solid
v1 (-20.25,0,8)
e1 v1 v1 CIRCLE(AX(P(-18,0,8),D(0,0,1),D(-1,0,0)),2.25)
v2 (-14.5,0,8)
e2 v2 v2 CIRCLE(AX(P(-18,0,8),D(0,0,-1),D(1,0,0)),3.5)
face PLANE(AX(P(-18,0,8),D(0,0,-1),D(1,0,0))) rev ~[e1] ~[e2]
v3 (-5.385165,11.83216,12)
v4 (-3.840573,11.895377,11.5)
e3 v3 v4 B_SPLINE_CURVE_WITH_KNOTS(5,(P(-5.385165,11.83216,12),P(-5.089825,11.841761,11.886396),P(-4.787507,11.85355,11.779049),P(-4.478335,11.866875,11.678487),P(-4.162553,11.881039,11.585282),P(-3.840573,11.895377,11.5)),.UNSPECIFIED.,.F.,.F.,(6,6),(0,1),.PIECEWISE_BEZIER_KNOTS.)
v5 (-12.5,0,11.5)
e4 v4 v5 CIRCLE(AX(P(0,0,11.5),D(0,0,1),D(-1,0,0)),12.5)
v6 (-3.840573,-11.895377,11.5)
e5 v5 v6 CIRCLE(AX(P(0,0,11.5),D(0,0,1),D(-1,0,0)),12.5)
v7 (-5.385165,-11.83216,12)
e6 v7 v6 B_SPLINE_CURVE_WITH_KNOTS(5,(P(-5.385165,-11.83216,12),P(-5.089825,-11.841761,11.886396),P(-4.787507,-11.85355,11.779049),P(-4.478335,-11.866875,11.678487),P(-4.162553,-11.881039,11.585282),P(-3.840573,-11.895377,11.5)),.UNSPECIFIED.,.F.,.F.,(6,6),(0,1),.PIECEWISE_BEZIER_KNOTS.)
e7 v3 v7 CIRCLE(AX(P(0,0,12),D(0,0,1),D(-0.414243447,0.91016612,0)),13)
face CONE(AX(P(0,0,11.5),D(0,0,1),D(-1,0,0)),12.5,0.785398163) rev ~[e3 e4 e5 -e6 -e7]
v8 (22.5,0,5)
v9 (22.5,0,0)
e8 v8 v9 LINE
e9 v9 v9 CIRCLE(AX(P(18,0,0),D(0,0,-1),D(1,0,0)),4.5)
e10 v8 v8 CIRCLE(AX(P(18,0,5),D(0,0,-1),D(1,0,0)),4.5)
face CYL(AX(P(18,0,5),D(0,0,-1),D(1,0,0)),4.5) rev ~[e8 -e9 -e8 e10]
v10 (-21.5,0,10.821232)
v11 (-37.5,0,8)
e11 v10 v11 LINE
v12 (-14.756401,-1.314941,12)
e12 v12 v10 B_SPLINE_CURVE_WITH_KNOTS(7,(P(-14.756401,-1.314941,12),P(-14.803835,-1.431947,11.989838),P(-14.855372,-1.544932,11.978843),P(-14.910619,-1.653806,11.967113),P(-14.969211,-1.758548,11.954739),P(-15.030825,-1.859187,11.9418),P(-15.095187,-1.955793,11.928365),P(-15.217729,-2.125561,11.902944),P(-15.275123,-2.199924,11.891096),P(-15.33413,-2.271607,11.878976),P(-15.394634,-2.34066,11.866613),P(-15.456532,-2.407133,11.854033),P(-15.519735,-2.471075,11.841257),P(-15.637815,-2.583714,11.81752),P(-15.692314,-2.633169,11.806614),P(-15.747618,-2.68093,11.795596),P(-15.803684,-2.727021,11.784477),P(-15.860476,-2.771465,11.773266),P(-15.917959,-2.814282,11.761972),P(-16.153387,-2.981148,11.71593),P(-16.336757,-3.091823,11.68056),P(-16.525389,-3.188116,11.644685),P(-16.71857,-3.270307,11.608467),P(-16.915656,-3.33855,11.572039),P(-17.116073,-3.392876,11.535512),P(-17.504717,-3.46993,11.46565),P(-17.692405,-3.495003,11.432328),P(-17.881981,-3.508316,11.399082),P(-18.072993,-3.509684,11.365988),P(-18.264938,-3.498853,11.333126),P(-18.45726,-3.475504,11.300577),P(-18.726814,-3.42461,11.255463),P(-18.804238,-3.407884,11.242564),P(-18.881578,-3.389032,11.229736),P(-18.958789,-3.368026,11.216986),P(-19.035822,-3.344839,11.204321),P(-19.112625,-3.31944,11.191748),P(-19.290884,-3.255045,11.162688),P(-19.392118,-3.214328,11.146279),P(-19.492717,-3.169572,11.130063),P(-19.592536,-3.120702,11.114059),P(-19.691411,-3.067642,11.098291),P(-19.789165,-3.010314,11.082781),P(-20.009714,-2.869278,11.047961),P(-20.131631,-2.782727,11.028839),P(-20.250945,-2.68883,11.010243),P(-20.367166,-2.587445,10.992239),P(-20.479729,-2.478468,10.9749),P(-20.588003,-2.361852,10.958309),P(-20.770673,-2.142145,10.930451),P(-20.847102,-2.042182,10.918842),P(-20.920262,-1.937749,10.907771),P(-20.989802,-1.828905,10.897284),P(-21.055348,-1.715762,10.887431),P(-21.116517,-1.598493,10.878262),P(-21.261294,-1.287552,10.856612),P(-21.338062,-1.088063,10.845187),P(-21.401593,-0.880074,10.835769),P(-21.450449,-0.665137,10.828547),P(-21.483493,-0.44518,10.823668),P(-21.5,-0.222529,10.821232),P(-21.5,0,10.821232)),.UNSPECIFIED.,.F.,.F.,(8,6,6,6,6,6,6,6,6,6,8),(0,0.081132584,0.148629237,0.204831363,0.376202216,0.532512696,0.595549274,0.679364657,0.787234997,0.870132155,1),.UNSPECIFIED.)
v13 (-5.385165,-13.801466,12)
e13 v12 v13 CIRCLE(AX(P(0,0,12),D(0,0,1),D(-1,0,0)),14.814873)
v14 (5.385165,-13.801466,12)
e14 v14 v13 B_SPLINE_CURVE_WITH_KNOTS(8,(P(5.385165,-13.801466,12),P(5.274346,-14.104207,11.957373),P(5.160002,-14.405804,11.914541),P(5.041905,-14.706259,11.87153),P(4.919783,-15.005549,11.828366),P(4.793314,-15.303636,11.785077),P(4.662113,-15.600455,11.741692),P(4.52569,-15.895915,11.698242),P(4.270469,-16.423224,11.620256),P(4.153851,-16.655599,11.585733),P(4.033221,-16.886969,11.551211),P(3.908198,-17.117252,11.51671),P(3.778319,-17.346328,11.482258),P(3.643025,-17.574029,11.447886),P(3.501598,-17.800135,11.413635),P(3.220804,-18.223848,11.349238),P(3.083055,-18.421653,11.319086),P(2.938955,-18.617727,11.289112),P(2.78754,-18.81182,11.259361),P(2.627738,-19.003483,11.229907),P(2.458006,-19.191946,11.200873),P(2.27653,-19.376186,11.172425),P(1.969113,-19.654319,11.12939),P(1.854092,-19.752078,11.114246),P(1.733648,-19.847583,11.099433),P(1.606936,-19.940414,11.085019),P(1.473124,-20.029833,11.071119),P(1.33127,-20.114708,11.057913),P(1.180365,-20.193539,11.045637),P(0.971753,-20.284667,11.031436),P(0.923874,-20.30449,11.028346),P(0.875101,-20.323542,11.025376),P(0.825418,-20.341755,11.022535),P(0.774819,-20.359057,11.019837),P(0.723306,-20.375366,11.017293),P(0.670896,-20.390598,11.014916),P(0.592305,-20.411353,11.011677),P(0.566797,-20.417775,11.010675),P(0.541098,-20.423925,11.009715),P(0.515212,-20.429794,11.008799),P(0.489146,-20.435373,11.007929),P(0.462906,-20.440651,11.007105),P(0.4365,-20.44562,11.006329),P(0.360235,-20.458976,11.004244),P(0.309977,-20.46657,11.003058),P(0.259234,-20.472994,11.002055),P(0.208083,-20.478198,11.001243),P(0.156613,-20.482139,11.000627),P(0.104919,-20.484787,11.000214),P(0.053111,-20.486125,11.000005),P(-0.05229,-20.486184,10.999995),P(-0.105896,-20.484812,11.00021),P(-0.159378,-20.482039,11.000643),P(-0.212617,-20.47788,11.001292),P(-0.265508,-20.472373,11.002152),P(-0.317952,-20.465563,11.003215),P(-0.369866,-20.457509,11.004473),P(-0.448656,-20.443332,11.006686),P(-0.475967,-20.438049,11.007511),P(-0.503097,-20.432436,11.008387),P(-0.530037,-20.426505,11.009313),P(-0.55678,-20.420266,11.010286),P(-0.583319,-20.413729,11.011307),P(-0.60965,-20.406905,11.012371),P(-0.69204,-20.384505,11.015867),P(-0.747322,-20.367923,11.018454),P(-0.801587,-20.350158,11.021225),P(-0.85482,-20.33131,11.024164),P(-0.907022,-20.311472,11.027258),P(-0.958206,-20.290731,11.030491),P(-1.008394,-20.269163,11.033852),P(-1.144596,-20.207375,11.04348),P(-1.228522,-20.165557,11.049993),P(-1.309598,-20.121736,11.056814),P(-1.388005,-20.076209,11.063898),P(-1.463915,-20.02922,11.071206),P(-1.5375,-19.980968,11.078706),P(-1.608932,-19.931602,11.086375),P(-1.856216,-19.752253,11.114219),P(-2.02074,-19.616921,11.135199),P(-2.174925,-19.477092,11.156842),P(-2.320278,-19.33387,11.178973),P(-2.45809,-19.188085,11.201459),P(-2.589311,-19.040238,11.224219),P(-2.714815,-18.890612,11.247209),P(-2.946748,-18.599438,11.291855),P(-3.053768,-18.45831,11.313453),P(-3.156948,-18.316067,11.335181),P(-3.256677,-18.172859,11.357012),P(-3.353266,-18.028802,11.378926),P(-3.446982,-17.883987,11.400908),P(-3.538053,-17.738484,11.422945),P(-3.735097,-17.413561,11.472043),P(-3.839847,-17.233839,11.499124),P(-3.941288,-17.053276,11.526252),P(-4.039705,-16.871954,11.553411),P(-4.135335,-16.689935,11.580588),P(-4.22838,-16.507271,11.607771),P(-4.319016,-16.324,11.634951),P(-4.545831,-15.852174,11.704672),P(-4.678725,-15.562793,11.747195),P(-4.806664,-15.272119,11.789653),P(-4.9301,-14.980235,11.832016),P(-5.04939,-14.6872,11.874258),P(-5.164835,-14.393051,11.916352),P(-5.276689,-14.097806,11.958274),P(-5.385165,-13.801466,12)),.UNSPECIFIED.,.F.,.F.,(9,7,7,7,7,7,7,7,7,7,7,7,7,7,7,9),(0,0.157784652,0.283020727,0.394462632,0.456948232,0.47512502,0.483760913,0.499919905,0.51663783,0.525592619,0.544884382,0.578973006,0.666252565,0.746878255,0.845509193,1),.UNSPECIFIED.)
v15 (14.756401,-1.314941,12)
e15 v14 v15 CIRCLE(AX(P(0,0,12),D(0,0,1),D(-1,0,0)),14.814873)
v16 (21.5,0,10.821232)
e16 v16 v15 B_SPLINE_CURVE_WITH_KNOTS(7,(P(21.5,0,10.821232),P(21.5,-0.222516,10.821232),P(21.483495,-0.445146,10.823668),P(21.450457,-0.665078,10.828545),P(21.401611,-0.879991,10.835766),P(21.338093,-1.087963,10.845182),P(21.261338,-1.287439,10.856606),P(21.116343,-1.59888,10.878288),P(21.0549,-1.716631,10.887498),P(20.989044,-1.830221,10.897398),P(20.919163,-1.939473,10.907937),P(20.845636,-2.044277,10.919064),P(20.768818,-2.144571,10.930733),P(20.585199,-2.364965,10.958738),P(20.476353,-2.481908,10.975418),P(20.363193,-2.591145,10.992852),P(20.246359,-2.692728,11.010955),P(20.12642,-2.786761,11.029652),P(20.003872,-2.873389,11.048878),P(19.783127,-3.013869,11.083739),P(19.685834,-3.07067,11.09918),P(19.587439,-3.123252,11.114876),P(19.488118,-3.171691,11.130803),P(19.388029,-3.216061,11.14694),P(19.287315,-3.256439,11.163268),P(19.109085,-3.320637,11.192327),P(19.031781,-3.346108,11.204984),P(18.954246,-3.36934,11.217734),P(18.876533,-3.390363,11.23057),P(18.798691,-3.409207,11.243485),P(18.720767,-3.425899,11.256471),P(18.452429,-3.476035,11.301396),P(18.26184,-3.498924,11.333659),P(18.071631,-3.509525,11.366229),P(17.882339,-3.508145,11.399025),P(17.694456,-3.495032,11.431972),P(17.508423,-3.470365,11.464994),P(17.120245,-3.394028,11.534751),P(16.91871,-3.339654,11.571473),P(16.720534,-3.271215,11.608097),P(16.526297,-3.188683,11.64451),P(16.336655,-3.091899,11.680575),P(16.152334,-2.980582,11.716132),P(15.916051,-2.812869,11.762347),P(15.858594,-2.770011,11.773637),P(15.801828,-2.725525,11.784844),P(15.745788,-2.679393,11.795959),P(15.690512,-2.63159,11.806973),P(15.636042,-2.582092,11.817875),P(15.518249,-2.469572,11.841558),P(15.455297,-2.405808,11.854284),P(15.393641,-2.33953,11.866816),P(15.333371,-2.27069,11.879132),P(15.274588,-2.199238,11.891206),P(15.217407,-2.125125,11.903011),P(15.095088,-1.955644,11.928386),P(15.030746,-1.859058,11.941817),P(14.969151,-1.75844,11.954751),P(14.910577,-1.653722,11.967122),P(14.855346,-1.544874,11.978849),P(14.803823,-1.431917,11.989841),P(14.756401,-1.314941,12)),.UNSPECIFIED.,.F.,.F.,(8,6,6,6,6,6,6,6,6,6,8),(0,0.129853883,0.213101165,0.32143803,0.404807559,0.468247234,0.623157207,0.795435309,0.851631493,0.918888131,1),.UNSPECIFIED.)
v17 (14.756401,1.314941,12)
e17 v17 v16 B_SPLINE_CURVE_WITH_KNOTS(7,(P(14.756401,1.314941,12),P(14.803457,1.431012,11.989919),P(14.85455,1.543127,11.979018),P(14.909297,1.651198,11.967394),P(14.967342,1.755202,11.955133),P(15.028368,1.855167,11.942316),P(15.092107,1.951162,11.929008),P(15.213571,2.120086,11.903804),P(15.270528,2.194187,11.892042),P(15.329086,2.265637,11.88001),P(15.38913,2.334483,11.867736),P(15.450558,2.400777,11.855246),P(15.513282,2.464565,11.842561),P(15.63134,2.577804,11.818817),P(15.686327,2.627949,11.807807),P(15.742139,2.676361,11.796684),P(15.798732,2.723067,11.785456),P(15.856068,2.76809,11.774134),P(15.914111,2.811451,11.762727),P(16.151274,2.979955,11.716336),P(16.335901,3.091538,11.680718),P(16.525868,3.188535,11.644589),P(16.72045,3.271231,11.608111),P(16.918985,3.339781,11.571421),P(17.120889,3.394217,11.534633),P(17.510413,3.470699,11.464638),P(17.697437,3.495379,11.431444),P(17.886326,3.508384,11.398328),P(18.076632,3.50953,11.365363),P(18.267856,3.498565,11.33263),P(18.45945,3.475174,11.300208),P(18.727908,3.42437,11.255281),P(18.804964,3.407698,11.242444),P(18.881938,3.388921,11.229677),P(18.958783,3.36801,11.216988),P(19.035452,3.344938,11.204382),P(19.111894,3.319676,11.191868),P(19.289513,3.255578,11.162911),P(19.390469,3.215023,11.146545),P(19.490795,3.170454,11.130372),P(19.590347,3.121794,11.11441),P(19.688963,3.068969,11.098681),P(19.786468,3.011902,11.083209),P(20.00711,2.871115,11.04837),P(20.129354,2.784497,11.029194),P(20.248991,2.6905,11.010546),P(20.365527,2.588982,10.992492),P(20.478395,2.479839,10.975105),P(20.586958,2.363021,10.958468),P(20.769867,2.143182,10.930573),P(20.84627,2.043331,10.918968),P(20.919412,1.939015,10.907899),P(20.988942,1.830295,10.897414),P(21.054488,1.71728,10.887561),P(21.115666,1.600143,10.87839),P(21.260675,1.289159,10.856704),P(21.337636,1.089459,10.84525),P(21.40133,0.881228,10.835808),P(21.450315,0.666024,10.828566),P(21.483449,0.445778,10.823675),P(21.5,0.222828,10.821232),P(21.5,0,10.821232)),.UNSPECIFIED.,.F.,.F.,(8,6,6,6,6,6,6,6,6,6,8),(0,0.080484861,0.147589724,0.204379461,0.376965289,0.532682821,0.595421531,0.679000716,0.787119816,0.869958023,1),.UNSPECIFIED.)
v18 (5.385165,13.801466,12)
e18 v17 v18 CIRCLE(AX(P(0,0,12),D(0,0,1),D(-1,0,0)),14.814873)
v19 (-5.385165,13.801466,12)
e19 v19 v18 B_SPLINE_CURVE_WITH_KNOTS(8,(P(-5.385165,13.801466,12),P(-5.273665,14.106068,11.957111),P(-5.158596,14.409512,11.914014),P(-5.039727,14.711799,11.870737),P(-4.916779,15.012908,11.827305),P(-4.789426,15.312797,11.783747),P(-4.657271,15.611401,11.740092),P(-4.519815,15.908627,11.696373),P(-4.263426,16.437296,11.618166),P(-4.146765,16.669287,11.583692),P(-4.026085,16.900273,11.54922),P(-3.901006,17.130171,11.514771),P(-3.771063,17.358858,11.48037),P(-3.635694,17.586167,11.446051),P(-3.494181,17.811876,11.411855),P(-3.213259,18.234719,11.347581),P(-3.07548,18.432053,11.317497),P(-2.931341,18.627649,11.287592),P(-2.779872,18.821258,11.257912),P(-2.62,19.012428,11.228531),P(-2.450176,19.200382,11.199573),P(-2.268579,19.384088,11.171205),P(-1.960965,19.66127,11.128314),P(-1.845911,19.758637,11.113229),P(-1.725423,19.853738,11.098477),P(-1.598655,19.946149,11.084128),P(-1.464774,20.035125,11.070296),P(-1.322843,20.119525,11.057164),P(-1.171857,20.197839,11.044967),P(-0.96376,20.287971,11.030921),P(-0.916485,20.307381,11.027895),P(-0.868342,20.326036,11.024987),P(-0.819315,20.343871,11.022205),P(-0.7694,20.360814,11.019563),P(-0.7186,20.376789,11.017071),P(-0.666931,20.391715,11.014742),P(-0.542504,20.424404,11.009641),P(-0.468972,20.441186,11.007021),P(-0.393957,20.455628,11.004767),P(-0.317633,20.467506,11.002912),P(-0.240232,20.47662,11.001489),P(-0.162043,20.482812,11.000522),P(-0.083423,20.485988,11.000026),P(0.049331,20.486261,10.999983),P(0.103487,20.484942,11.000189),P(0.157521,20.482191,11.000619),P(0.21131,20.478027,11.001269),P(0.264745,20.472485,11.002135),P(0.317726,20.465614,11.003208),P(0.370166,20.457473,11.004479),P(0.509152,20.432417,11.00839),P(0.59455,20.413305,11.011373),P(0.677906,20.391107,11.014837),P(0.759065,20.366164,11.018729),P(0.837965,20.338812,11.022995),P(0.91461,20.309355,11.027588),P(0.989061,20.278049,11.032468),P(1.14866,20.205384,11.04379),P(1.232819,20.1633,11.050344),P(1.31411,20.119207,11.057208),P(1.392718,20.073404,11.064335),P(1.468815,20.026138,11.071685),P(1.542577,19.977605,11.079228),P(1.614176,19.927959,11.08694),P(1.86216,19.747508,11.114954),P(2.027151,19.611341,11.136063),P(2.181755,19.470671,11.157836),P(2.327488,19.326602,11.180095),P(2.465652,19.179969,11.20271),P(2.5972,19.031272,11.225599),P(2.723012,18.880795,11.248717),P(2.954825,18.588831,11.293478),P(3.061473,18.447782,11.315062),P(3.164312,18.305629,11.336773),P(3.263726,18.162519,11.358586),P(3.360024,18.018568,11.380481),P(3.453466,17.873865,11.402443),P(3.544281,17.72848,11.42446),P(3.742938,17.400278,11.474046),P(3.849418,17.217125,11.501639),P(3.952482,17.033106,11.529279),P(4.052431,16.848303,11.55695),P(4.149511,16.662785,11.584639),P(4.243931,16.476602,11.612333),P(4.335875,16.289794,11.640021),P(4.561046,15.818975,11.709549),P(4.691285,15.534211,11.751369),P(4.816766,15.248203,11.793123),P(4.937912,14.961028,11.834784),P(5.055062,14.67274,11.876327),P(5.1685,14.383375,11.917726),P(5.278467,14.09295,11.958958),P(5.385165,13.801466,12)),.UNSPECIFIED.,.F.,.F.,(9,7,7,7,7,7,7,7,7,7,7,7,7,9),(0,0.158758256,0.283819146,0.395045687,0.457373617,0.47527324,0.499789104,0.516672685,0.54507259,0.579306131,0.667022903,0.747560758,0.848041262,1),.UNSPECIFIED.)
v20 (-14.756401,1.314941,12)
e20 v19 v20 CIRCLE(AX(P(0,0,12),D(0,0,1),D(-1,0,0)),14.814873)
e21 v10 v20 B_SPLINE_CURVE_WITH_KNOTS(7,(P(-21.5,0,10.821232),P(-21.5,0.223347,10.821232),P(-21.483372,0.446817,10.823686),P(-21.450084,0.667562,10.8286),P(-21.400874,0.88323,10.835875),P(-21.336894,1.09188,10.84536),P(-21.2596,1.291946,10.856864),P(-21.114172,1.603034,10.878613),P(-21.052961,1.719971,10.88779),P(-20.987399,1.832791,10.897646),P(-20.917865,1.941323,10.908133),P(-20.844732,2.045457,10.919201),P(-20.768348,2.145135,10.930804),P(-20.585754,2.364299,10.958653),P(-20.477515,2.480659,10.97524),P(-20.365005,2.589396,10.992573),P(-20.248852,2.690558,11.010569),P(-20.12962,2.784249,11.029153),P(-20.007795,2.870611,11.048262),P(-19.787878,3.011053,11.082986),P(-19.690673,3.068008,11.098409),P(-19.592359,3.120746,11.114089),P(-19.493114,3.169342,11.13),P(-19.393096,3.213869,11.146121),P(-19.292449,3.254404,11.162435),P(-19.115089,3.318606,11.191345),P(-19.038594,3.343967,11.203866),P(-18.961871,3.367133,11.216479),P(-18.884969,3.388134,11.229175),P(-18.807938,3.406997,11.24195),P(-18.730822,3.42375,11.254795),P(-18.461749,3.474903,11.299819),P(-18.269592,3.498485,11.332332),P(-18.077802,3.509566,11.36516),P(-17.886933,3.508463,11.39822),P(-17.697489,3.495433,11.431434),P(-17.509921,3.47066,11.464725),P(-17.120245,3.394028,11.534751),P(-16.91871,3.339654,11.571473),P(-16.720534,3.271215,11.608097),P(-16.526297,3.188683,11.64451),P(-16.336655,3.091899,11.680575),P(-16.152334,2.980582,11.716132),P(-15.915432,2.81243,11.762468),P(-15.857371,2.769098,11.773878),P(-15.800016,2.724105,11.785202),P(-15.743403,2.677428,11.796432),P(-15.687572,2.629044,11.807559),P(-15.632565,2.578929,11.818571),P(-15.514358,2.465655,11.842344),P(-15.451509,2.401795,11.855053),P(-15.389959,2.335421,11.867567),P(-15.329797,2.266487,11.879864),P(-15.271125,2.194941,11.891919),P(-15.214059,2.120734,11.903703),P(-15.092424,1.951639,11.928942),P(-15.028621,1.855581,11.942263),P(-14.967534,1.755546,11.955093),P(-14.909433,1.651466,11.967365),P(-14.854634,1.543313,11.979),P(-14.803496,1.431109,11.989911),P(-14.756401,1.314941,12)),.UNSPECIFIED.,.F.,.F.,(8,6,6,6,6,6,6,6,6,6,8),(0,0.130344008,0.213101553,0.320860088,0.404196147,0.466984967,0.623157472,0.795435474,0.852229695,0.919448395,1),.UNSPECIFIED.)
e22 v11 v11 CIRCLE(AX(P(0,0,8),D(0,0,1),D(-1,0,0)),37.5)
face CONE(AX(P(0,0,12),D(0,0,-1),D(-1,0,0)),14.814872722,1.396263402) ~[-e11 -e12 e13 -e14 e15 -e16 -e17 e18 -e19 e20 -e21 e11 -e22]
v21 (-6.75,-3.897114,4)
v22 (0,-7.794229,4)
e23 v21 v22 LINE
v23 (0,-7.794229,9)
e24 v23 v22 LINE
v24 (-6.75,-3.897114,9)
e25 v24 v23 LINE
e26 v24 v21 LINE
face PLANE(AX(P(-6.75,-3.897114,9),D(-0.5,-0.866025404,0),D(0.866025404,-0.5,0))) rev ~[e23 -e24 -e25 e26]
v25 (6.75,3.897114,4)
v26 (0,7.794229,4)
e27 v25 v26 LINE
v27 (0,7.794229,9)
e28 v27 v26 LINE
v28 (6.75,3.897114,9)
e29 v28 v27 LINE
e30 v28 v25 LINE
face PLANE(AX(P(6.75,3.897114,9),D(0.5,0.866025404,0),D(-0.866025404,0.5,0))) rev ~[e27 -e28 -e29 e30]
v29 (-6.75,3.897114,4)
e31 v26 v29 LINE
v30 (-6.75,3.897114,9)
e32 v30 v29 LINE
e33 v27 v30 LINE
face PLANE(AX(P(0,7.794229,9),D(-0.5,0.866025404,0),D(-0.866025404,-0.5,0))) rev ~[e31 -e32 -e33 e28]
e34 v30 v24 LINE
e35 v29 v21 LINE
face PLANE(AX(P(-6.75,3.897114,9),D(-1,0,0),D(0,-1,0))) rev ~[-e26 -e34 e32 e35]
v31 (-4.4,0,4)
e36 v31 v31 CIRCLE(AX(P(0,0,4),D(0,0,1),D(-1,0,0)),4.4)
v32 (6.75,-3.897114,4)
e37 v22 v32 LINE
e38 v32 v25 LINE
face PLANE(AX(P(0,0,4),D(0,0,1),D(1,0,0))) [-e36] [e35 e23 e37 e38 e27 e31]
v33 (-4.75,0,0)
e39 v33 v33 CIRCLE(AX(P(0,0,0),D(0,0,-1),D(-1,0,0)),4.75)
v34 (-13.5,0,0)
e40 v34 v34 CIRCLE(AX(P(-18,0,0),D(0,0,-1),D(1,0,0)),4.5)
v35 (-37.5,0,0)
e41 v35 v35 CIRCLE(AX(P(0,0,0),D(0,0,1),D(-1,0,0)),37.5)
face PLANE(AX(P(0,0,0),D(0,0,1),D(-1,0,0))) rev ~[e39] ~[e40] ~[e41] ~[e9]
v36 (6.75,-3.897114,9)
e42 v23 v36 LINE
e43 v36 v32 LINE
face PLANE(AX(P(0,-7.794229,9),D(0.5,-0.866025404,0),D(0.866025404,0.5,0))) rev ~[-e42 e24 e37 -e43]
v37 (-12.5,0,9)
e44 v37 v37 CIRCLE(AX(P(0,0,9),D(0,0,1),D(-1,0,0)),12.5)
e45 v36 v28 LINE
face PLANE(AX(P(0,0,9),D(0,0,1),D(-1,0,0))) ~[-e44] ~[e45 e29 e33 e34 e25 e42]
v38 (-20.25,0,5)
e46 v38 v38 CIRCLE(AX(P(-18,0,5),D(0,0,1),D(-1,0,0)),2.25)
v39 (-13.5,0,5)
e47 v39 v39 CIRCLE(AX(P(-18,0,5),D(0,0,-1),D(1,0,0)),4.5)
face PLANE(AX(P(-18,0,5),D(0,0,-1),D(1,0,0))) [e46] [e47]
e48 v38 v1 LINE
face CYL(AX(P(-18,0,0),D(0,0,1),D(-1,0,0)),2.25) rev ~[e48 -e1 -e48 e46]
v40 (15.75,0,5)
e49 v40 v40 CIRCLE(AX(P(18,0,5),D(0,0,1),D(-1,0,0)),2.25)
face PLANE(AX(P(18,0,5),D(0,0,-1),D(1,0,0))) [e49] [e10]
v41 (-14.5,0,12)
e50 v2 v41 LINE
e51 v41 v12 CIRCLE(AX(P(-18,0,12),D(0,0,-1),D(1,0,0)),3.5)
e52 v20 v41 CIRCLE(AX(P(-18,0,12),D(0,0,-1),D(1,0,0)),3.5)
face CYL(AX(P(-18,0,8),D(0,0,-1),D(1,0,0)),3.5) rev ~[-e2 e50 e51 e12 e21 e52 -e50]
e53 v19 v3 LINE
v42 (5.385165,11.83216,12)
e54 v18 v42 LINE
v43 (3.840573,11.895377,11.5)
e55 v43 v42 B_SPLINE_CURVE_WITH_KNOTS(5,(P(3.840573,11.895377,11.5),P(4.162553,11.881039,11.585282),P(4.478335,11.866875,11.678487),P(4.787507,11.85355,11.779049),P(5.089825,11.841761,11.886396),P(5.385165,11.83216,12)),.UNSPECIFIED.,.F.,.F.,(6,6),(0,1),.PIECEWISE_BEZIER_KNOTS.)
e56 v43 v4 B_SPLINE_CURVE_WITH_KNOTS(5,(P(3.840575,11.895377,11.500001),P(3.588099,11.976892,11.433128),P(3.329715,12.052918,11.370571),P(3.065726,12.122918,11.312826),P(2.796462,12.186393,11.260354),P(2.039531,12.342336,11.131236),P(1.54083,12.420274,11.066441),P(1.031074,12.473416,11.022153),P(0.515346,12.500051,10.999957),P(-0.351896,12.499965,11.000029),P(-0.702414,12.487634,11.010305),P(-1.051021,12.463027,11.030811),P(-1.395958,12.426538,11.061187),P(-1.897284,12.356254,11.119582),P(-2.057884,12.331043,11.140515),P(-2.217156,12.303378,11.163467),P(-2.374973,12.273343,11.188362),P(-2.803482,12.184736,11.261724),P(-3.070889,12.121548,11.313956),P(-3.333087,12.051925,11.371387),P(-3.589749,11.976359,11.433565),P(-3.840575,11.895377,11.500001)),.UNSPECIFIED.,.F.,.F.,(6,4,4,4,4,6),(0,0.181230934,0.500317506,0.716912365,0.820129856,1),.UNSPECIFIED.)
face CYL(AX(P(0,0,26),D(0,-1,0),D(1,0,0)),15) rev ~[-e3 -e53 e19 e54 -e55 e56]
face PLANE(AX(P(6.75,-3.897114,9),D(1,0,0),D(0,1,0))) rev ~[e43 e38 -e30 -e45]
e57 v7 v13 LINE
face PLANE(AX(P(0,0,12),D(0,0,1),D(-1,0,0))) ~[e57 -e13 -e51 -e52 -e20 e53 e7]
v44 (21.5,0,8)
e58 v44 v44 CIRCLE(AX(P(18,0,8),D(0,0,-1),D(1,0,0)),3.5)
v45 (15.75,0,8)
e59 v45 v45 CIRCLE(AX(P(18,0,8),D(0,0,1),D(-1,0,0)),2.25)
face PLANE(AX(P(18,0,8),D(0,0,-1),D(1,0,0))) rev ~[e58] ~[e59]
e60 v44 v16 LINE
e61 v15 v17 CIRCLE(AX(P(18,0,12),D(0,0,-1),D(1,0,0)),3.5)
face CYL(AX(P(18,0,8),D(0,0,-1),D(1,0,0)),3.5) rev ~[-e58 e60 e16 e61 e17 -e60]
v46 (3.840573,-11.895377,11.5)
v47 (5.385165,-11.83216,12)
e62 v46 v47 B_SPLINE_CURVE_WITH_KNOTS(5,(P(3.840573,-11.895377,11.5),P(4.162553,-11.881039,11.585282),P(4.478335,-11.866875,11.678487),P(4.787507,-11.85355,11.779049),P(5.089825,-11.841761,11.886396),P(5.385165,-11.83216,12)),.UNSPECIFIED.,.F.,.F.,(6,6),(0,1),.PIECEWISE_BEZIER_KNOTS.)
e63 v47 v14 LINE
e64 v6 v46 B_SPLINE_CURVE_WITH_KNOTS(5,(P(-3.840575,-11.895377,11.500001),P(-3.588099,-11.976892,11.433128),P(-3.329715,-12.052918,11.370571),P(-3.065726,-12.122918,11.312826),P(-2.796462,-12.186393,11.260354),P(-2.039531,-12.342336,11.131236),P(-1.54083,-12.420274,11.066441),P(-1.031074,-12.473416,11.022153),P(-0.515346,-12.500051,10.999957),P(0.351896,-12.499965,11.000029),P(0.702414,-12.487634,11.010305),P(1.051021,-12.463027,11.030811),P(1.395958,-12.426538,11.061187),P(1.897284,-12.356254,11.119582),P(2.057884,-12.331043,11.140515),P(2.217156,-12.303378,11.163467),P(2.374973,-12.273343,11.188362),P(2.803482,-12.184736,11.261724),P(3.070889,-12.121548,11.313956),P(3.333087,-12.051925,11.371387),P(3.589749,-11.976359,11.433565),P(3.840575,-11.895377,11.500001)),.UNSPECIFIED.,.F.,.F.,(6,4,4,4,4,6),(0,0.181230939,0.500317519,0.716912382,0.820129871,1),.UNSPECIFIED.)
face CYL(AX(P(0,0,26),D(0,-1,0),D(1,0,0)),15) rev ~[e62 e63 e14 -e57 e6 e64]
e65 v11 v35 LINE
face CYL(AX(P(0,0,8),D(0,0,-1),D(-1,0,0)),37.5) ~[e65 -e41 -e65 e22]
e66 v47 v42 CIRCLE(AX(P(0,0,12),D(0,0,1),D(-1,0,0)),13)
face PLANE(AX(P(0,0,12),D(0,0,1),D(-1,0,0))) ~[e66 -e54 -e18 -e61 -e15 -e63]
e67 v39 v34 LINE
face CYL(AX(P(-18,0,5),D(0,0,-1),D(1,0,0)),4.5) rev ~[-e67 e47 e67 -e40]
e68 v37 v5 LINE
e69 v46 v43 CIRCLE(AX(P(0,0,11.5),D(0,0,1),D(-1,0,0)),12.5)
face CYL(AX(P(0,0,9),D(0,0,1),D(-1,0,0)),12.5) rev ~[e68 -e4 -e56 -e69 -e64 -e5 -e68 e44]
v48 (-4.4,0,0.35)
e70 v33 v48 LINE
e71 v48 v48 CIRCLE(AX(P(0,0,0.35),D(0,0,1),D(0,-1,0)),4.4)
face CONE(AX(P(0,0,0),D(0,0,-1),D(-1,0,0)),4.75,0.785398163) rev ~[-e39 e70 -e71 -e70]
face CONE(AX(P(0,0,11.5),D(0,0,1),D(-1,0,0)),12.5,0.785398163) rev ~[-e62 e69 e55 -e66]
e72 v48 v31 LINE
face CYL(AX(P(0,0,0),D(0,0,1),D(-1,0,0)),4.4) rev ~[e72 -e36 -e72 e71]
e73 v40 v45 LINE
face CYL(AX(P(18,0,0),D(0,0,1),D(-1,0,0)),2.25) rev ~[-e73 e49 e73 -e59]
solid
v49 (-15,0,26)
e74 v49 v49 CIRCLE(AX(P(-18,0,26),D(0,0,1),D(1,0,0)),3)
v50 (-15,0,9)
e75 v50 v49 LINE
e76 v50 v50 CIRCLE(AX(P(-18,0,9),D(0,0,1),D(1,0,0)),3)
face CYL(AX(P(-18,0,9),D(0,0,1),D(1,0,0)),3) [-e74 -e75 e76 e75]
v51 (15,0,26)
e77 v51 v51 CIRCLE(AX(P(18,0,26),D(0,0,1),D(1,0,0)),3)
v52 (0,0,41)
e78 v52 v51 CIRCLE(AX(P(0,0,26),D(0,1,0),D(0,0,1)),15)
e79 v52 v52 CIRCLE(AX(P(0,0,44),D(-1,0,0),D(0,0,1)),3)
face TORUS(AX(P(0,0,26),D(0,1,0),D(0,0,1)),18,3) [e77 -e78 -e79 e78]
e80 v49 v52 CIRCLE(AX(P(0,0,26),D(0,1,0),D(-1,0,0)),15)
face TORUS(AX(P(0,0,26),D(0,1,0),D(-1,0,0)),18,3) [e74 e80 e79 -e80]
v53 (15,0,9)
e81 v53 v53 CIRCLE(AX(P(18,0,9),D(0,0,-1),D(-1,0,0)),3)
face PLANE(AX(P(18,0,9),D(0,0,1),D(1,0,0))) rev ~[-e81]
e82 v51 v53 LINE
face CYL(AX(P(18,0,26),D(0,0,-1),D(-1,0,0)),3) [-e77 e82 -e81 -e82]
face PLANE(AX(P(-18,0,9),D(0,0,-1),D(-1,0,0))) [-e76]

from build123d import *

# Parameters (mm, degrees)
F2_SIZE         = 0.5
F3_R            = 15
F4_DEPTH        = 50
F8_R            = 3
F12_D           = 7
F12_DEPTH       = 5.5
F12_TIP         = 2.1030121666
F14_D           = 4.5
F14_CBORE_D     = 9
F14_CBORE_DEPTH = 5
F15_D           = 8.8
F15_CSINK_D     = 9.5
F15_CSINK_ANGLE = 90
F17_DEPTH       = 5


# Not quite as in the source:
# - a feature of the source that left no trace in its solid (it failed there, or was rolled back) is left out


with BuildPart() as f1:
    # F0 (on Front) → F1 (revolve)
    with BuildSketch(Plane.XZ):
        Polygon((-37.5, 0), (0, 0), (0, 9), (-12.5, 9), (-12.5, 12), (-14.8148727215, 12), (-37.5, 8), align=None)
    revolve(axis=Axis((0, 0, 21.8192628079), (0, 0, 1)))

    # F2
    f2_edges = [f1.edges().sort_by_distance(p)[0] for p in [
        (12.5, 0, 12),
    ]]
    chamfer(f2_edges, length=F2_SIZE)


with BuildPart() as f4:
    # F3 (on Front) → F4 (new body, symmetric)
    with BuildSketch(Plane.XZ):
        with Locations((0, 26)):
            Circle(F3_R)
    extrude(amount=F4_DEPTH, both=True)


with BuildPart() as f1_1:
    add(f1.part)

    # F5: cut F4
    add(f4.part, mode=Mode.SUBTRACT)

    # F12 (one way)
    with BuildSketch(Plane(origin=(0, 0, 8), x_dir=(1, 0, 0), z_dir=(0, 0, -1))):
        with Locations((-18, 0), (18, 0)):
            Circle(F12_D / 2)
    extrude(amount=-F12_DEPTH, mode=Mode.SUBTRACT)
    with Locations(Plane(origin=(0, 0, 8), x_dir=(1, 0, 0), z_dir=(0, 0, -1))):
        with Locations((-18, 0), (18, 0)):
            with Locations((0, 0, -(F12_DEPTH + F12_TIP / 2))):  # 118° drill point
                Cone(0, F12_D / 2, F12_TIP, mode=Mode.SUBTRACT)

    # F14 (through all)
    with Locations(Plane(origin=(0, 0, 0), x_dir=(1, 0, 0), z_dir=(0, 0, -1))):
        with Locations((-18, 0), (18, 0)):
            CounterBoreHole(F14_D / 2, F14_CBORE_D / 2, F14_CBORE_DEPTH)

    # F15 (through all)
    with Locations(Plane(origin=(0, 0, 0), x_dir=(1, 0, 0), z_dir=(0, 0, -1))):
        with Locations((0, 0)):
            CounterSinkHole(F15_D / 2, F15_CSINK_D / 2, counter_sink_angle=F15_CSINK_ANGLE)

    # F16 (on face) → F17 (cut)
    with BuildSketch(Plane.XY.offset(9)):
        Polygon((6.75, 3.897114317), (0, 7.7942286341), (-6.75, 3.897114317), (-6.75, -3.897114317), (0, -7.7942286341), (6.75, -3.897114317), align=None)
    extrude(amount=-F17_DEPTH, mode=Mode.SUBTRACT)


with BuildPart() as f9:
    # F9: sweep along a path in F6
    with BuildLine(Plane.XZ) as f9_path:
        Line((-18, 9), (-18, 26))
        ThreePointArc((-18, 26), (-12.7279220614, 38.7279220614), (0, 44))
        ThreePointArc((0, 44), (12.7279220614, 38.7279220614), (18, 26))
        Line((18, 26), (18, 9))
    # F8 (on line) → F9 (sweep)
    with BuildSketch(Plane(origin=(0, 0, 9), x_dir=(1, 0, 0), z_dir=(0, 0, -1))):
        with Locations((-18, 0)):
            Circle(F8_R)
    sweep(path=f9_path.line)


solid = Compound([f1_1.part, f9.part])
